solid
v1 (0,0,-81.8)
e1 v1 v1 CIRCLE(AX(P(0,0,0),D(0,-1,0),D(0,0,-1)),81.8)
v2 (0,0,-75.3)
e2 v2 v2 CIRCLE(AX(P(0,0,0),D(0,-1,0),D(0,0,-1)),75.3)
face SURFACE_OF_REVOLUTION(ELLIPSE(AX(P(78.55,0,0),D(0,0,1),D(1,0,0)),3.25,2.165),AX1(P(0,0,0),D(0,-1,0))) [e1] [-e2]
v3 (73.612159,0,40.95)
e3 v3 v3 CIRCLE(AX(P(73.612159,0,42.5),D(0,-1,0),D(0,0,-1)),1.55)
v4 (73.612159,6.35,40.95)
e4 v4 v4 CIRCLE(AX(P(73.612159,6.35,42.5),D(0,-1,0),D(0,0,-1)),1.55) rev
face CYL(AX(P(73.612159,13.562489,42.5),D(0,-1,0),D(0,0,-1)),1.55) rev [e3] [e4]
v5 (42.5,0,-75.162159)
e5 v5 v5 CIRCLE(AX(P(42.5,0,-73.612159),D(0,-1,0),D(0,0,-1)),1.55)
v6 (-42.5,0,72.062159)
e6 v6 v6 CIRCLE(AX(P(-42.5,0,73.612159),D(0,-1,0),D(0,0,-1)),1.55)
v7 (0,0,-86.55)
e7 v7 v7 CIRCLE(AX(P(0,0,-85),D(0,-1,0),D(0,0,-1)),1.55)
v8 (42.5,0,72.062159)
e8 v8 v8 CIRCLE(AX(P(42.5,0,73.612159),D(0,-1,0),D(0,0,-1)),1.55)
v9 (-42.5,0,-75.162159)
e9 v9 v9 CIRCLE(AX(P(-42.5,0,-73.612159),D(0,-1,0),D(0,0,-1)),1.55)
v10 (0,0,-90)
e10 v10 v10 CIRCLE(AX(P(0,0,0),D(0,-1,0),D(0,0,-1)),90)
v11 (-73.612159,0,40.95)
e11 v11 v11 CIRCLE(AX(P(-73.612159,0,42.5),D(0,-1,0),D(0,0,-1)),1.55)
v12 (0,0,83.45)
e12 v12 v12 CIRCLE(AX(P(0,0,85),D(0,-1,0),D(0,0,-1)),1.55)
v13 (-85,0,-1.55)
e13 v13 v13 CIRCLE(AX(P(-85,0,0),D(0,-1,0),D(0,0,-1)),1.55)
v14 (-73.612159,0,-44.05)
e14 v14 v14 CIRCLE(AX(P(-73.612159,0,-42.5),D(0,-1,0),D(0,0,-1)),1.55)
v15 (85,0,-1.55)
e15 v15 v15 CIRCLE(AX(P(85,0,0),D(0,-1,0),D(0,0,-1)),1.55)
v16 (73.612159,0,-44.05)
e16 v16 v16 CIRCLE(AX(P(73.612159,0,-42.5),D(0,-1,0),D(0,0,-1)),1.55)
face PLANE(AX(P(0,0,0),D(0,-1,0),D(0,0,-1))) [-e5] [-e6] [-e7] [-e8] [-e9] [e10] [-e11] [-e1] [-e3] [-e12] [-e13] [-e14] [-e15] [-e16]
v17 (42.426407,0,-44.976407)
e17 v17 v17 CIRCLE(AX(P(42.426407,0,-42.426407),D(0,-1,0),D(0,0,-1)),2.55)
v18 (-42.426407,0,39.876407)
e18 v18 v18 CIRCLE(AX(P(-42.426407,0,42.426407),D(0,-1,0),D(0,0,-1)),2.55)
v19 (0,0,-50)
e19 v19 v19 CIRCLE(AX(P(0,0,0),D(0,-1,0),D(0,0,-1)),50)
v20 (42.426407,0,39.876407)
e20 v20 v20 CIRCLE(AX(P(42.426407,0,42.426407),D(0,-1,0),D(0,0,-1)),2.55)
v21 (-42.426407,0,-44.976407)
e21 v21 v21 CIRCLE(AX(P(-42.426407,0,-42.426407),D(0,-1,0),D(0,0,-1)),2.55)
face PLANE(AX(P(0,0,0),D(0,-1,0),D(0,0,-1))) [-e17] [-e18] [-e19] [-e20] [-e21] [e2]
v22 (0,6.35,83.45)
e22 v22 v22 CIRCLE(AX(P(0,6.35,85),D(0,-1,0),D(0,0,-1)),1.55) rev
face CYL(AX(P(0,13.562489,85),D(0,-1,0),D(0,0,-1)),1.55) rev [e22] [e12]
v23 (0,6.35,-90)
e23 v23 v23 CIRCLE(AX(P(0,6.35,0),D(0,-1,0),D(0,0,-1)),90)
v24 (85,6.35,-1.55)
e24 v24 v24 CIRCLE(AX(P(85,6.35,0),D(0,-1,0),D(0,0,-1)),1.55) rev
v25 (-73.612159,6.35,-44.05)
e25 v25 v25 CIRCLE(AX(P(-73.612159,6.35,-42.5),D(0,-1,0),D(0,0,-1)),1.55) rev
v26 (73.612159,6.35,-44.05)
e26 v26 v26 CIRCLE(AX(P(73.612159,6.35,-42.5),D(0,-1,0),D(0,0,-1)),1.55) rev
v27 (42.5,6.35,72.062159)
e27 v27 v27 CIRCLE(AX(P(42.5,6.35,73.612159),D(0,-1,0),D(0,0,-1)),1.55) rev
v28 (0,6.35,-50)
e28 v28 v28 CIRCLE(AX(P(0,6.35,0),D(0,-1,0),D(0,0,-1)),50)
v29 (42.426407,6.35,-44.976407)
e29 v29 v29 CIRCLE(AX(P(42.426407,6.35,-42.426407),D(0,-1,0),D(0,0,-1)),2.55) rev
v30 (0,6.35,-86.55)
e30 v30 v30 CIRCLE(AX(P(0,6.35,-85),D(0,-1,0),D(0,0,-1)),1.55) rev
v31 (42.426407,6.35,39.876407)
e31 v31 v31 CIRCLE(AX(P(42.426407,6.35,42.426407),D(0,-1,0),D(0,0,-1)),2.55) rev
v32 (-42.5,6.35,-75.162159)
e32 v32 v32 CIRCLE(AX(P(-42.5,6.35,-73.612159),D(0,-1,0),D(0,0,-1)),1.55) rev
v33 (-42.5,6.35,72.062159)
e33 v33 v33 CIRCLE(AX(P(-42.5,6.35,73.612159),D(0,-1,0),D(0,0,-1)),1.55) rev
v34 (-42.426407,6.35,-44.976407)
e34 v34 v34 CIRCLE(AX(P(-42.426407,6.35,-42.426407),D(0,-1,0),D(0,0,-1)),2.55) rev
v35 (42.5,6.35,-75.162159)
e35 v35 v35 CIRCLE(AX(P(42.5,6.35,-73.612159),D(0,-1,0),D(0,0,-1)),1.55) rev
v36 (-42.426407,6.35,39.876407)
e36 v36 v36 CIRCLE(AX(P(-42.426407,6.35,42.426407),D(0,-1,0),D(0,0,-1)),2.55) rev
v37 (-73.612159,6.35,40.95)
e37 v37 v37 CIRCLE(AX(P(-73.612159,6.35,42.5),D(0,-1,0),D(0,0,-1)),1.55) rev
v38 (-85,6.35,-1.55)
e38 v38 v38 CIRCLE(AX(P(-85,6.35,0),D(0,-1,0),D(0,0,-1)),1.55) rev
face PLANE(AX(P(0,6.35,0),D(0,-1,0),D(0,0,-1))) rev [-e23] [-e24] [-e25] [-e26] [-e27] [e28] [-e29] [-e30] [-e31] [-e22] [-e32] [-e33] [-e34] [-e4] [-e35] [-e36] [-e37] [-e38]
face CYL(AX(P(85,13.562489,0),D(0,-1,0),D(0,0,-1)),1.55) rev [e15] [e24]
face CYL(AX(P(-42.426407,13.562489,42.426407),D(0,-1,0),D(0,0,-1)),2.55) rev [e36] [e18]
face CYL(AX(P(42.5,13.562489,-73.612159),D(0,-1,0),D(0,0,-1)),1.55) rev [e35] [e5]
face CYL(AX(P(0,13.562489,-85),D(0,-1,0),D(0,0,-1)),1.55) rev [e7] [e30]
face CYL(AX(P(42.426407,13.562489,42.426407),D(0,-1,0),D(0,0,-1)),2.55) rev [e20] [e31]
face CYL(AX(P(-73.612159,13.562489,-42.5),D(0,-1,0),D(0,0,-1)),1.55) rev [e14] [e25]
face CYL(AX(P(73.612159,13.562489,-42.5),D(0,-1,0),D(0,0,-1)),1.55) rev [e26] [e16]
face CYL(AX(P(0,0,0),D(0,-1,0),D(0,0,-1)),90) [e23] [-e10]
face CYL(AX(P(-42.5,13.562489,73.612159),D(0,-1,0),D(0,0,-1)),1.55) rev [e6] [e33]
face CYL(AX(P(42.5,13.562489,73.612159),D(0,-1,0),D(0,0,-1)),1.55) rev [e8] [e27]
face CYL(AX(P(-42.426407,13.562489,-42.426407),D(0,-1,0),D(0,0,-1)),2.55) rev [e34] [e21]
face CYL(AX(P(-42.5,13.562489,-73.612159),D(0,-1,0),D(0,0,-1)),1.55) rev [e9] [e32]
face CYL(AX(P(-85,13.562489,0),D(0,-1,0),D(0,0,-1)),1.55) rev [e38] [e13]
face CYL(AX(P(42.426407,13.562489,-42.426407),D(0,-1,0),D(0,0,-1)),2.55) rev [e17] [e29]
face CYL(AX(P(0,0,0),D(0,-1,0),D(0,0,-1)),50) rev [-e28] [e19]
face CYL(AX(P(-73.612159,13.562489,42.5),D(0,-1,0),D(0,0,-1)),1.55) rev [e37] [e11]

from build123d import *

# Parameters (mm, degrees)
CUT_EXTRUDE1_START       = -6.35
CUT_EXTRUDE1_OUTLINE_R   = 2.55
CUT_EXTRUDE1_OUTLINE_R_2 = 1.55
CUT_EXTRUDE1_DEPTH       = 6.35


# Read off the part's stored shape, not the designer's step: Cut-Extrude1
with BuildPart() as part:
    # Sketch1 → Revolve1 (revolve)
    with BuildSketch(Plane.XY, mode=Mode.PRIVATE) as revolve1_sk:
        with BuildLine():
            Line((90, 6.35), (50, 6.35))
            Line((50, 6.35), (50, 0))
            Line((50, 0), (75.3, 0))
            add(Edge.make_bspline(
                [(81.8, 0), (81.8, 2.165), (78.55, 2.165), (75.3, 2.165), (75.3, 0)],
                knots=[0, 0, 0, 1.570796327, 1.570796327, 3.141592654, 3.141592654, 3.141592654], degree=2, weights=[1, 0.707106781, 1, 0.707106781, 1]))
            Line((81.8, 0), (90, 0))
            Line((90, 0), (90, 6.35))
        make_face()
    revolve(revolve1_sk.sketch.rotate(Axis((0, 0, 0), (0, 1, 0)), 90), axis=Axis((0, 0, 0), (0, 1, 0)))

    # Cut-Extrude1 outline → Cut-Extrude1 (cut)
    with BuildSketch(Plane.XZ.offset(CUT_EXTRUDE1_START)):
        with Locations((-42.426406871, -42.426406871)):
            Circle(CUT_EXTRUDE1_OUTLINE_R)
        with Locations((42.426406871, -42.426406871)):
            Circle(CUT_EXTRUDE1_OUTLINE_R)
        with Locations((42.426406871, 42.426406871)):
            Circle(CUT_EXTRUDE1_OUTLINE_R)
        with Locations((-42.426406871, 42.426406871)):
            Circle(CUT_EXTRUDE1_OUTLINE_R)
        with Locations((-73.612159322, -42.5)):
            Circle(CUT_EXTRUDE1_OUTLINE_R_2)
        with Locations((-42.5, -73.612159322)):
            Circle(CUT_EXTRUDE1_OUTLINE_R_2)
        with Locations((0, -85)):
            Circle(CUT_EXTRUDE1_OUTLINE_R_2)
        with Locations((42.5, -73.612159322)):
            Circle(CUT_EXTRUDE1_OUTLINE_R_2)
        with Locations((73.612159322, -42.5)):
            Circle(CUT_EXTRUDE1_OUTLINE_R_2)
        with Locations((85, 0)):
            Circle(CUT_EXTRUDE1_OUTLINE_R_2)
        with Locations((73.612159322, 42.5)):
            Circle(CUT_EXTRUDE1_OUTLINE_R_2)
        with Locations((42.5, 73.612159322)):
            Circle(CUT_EXTRUDE1_OUTLINE_R_2)
        with Locations((-42.5, 73.612159322)):
            Circle(CUT_EXTRUDE1_OUTLINE_R_2)
        with Locations((-73.612159322, 42.5)):
            Circle(CUT_EXTRUDE1_OUTLINE_R_2)
        with Locations((-85, 0)):
            Circle(CUT_EXTRUDE1_OUTLINE_R_2)
        with Locations((0, 85)):
            Circle(CUT_EXTRUDE1_OUTLINE_R_2)
    extrude(amount=CUT_EXTRUDE1_DEPTH, mode=Mode.SUBTRACT)


solid = part.part
